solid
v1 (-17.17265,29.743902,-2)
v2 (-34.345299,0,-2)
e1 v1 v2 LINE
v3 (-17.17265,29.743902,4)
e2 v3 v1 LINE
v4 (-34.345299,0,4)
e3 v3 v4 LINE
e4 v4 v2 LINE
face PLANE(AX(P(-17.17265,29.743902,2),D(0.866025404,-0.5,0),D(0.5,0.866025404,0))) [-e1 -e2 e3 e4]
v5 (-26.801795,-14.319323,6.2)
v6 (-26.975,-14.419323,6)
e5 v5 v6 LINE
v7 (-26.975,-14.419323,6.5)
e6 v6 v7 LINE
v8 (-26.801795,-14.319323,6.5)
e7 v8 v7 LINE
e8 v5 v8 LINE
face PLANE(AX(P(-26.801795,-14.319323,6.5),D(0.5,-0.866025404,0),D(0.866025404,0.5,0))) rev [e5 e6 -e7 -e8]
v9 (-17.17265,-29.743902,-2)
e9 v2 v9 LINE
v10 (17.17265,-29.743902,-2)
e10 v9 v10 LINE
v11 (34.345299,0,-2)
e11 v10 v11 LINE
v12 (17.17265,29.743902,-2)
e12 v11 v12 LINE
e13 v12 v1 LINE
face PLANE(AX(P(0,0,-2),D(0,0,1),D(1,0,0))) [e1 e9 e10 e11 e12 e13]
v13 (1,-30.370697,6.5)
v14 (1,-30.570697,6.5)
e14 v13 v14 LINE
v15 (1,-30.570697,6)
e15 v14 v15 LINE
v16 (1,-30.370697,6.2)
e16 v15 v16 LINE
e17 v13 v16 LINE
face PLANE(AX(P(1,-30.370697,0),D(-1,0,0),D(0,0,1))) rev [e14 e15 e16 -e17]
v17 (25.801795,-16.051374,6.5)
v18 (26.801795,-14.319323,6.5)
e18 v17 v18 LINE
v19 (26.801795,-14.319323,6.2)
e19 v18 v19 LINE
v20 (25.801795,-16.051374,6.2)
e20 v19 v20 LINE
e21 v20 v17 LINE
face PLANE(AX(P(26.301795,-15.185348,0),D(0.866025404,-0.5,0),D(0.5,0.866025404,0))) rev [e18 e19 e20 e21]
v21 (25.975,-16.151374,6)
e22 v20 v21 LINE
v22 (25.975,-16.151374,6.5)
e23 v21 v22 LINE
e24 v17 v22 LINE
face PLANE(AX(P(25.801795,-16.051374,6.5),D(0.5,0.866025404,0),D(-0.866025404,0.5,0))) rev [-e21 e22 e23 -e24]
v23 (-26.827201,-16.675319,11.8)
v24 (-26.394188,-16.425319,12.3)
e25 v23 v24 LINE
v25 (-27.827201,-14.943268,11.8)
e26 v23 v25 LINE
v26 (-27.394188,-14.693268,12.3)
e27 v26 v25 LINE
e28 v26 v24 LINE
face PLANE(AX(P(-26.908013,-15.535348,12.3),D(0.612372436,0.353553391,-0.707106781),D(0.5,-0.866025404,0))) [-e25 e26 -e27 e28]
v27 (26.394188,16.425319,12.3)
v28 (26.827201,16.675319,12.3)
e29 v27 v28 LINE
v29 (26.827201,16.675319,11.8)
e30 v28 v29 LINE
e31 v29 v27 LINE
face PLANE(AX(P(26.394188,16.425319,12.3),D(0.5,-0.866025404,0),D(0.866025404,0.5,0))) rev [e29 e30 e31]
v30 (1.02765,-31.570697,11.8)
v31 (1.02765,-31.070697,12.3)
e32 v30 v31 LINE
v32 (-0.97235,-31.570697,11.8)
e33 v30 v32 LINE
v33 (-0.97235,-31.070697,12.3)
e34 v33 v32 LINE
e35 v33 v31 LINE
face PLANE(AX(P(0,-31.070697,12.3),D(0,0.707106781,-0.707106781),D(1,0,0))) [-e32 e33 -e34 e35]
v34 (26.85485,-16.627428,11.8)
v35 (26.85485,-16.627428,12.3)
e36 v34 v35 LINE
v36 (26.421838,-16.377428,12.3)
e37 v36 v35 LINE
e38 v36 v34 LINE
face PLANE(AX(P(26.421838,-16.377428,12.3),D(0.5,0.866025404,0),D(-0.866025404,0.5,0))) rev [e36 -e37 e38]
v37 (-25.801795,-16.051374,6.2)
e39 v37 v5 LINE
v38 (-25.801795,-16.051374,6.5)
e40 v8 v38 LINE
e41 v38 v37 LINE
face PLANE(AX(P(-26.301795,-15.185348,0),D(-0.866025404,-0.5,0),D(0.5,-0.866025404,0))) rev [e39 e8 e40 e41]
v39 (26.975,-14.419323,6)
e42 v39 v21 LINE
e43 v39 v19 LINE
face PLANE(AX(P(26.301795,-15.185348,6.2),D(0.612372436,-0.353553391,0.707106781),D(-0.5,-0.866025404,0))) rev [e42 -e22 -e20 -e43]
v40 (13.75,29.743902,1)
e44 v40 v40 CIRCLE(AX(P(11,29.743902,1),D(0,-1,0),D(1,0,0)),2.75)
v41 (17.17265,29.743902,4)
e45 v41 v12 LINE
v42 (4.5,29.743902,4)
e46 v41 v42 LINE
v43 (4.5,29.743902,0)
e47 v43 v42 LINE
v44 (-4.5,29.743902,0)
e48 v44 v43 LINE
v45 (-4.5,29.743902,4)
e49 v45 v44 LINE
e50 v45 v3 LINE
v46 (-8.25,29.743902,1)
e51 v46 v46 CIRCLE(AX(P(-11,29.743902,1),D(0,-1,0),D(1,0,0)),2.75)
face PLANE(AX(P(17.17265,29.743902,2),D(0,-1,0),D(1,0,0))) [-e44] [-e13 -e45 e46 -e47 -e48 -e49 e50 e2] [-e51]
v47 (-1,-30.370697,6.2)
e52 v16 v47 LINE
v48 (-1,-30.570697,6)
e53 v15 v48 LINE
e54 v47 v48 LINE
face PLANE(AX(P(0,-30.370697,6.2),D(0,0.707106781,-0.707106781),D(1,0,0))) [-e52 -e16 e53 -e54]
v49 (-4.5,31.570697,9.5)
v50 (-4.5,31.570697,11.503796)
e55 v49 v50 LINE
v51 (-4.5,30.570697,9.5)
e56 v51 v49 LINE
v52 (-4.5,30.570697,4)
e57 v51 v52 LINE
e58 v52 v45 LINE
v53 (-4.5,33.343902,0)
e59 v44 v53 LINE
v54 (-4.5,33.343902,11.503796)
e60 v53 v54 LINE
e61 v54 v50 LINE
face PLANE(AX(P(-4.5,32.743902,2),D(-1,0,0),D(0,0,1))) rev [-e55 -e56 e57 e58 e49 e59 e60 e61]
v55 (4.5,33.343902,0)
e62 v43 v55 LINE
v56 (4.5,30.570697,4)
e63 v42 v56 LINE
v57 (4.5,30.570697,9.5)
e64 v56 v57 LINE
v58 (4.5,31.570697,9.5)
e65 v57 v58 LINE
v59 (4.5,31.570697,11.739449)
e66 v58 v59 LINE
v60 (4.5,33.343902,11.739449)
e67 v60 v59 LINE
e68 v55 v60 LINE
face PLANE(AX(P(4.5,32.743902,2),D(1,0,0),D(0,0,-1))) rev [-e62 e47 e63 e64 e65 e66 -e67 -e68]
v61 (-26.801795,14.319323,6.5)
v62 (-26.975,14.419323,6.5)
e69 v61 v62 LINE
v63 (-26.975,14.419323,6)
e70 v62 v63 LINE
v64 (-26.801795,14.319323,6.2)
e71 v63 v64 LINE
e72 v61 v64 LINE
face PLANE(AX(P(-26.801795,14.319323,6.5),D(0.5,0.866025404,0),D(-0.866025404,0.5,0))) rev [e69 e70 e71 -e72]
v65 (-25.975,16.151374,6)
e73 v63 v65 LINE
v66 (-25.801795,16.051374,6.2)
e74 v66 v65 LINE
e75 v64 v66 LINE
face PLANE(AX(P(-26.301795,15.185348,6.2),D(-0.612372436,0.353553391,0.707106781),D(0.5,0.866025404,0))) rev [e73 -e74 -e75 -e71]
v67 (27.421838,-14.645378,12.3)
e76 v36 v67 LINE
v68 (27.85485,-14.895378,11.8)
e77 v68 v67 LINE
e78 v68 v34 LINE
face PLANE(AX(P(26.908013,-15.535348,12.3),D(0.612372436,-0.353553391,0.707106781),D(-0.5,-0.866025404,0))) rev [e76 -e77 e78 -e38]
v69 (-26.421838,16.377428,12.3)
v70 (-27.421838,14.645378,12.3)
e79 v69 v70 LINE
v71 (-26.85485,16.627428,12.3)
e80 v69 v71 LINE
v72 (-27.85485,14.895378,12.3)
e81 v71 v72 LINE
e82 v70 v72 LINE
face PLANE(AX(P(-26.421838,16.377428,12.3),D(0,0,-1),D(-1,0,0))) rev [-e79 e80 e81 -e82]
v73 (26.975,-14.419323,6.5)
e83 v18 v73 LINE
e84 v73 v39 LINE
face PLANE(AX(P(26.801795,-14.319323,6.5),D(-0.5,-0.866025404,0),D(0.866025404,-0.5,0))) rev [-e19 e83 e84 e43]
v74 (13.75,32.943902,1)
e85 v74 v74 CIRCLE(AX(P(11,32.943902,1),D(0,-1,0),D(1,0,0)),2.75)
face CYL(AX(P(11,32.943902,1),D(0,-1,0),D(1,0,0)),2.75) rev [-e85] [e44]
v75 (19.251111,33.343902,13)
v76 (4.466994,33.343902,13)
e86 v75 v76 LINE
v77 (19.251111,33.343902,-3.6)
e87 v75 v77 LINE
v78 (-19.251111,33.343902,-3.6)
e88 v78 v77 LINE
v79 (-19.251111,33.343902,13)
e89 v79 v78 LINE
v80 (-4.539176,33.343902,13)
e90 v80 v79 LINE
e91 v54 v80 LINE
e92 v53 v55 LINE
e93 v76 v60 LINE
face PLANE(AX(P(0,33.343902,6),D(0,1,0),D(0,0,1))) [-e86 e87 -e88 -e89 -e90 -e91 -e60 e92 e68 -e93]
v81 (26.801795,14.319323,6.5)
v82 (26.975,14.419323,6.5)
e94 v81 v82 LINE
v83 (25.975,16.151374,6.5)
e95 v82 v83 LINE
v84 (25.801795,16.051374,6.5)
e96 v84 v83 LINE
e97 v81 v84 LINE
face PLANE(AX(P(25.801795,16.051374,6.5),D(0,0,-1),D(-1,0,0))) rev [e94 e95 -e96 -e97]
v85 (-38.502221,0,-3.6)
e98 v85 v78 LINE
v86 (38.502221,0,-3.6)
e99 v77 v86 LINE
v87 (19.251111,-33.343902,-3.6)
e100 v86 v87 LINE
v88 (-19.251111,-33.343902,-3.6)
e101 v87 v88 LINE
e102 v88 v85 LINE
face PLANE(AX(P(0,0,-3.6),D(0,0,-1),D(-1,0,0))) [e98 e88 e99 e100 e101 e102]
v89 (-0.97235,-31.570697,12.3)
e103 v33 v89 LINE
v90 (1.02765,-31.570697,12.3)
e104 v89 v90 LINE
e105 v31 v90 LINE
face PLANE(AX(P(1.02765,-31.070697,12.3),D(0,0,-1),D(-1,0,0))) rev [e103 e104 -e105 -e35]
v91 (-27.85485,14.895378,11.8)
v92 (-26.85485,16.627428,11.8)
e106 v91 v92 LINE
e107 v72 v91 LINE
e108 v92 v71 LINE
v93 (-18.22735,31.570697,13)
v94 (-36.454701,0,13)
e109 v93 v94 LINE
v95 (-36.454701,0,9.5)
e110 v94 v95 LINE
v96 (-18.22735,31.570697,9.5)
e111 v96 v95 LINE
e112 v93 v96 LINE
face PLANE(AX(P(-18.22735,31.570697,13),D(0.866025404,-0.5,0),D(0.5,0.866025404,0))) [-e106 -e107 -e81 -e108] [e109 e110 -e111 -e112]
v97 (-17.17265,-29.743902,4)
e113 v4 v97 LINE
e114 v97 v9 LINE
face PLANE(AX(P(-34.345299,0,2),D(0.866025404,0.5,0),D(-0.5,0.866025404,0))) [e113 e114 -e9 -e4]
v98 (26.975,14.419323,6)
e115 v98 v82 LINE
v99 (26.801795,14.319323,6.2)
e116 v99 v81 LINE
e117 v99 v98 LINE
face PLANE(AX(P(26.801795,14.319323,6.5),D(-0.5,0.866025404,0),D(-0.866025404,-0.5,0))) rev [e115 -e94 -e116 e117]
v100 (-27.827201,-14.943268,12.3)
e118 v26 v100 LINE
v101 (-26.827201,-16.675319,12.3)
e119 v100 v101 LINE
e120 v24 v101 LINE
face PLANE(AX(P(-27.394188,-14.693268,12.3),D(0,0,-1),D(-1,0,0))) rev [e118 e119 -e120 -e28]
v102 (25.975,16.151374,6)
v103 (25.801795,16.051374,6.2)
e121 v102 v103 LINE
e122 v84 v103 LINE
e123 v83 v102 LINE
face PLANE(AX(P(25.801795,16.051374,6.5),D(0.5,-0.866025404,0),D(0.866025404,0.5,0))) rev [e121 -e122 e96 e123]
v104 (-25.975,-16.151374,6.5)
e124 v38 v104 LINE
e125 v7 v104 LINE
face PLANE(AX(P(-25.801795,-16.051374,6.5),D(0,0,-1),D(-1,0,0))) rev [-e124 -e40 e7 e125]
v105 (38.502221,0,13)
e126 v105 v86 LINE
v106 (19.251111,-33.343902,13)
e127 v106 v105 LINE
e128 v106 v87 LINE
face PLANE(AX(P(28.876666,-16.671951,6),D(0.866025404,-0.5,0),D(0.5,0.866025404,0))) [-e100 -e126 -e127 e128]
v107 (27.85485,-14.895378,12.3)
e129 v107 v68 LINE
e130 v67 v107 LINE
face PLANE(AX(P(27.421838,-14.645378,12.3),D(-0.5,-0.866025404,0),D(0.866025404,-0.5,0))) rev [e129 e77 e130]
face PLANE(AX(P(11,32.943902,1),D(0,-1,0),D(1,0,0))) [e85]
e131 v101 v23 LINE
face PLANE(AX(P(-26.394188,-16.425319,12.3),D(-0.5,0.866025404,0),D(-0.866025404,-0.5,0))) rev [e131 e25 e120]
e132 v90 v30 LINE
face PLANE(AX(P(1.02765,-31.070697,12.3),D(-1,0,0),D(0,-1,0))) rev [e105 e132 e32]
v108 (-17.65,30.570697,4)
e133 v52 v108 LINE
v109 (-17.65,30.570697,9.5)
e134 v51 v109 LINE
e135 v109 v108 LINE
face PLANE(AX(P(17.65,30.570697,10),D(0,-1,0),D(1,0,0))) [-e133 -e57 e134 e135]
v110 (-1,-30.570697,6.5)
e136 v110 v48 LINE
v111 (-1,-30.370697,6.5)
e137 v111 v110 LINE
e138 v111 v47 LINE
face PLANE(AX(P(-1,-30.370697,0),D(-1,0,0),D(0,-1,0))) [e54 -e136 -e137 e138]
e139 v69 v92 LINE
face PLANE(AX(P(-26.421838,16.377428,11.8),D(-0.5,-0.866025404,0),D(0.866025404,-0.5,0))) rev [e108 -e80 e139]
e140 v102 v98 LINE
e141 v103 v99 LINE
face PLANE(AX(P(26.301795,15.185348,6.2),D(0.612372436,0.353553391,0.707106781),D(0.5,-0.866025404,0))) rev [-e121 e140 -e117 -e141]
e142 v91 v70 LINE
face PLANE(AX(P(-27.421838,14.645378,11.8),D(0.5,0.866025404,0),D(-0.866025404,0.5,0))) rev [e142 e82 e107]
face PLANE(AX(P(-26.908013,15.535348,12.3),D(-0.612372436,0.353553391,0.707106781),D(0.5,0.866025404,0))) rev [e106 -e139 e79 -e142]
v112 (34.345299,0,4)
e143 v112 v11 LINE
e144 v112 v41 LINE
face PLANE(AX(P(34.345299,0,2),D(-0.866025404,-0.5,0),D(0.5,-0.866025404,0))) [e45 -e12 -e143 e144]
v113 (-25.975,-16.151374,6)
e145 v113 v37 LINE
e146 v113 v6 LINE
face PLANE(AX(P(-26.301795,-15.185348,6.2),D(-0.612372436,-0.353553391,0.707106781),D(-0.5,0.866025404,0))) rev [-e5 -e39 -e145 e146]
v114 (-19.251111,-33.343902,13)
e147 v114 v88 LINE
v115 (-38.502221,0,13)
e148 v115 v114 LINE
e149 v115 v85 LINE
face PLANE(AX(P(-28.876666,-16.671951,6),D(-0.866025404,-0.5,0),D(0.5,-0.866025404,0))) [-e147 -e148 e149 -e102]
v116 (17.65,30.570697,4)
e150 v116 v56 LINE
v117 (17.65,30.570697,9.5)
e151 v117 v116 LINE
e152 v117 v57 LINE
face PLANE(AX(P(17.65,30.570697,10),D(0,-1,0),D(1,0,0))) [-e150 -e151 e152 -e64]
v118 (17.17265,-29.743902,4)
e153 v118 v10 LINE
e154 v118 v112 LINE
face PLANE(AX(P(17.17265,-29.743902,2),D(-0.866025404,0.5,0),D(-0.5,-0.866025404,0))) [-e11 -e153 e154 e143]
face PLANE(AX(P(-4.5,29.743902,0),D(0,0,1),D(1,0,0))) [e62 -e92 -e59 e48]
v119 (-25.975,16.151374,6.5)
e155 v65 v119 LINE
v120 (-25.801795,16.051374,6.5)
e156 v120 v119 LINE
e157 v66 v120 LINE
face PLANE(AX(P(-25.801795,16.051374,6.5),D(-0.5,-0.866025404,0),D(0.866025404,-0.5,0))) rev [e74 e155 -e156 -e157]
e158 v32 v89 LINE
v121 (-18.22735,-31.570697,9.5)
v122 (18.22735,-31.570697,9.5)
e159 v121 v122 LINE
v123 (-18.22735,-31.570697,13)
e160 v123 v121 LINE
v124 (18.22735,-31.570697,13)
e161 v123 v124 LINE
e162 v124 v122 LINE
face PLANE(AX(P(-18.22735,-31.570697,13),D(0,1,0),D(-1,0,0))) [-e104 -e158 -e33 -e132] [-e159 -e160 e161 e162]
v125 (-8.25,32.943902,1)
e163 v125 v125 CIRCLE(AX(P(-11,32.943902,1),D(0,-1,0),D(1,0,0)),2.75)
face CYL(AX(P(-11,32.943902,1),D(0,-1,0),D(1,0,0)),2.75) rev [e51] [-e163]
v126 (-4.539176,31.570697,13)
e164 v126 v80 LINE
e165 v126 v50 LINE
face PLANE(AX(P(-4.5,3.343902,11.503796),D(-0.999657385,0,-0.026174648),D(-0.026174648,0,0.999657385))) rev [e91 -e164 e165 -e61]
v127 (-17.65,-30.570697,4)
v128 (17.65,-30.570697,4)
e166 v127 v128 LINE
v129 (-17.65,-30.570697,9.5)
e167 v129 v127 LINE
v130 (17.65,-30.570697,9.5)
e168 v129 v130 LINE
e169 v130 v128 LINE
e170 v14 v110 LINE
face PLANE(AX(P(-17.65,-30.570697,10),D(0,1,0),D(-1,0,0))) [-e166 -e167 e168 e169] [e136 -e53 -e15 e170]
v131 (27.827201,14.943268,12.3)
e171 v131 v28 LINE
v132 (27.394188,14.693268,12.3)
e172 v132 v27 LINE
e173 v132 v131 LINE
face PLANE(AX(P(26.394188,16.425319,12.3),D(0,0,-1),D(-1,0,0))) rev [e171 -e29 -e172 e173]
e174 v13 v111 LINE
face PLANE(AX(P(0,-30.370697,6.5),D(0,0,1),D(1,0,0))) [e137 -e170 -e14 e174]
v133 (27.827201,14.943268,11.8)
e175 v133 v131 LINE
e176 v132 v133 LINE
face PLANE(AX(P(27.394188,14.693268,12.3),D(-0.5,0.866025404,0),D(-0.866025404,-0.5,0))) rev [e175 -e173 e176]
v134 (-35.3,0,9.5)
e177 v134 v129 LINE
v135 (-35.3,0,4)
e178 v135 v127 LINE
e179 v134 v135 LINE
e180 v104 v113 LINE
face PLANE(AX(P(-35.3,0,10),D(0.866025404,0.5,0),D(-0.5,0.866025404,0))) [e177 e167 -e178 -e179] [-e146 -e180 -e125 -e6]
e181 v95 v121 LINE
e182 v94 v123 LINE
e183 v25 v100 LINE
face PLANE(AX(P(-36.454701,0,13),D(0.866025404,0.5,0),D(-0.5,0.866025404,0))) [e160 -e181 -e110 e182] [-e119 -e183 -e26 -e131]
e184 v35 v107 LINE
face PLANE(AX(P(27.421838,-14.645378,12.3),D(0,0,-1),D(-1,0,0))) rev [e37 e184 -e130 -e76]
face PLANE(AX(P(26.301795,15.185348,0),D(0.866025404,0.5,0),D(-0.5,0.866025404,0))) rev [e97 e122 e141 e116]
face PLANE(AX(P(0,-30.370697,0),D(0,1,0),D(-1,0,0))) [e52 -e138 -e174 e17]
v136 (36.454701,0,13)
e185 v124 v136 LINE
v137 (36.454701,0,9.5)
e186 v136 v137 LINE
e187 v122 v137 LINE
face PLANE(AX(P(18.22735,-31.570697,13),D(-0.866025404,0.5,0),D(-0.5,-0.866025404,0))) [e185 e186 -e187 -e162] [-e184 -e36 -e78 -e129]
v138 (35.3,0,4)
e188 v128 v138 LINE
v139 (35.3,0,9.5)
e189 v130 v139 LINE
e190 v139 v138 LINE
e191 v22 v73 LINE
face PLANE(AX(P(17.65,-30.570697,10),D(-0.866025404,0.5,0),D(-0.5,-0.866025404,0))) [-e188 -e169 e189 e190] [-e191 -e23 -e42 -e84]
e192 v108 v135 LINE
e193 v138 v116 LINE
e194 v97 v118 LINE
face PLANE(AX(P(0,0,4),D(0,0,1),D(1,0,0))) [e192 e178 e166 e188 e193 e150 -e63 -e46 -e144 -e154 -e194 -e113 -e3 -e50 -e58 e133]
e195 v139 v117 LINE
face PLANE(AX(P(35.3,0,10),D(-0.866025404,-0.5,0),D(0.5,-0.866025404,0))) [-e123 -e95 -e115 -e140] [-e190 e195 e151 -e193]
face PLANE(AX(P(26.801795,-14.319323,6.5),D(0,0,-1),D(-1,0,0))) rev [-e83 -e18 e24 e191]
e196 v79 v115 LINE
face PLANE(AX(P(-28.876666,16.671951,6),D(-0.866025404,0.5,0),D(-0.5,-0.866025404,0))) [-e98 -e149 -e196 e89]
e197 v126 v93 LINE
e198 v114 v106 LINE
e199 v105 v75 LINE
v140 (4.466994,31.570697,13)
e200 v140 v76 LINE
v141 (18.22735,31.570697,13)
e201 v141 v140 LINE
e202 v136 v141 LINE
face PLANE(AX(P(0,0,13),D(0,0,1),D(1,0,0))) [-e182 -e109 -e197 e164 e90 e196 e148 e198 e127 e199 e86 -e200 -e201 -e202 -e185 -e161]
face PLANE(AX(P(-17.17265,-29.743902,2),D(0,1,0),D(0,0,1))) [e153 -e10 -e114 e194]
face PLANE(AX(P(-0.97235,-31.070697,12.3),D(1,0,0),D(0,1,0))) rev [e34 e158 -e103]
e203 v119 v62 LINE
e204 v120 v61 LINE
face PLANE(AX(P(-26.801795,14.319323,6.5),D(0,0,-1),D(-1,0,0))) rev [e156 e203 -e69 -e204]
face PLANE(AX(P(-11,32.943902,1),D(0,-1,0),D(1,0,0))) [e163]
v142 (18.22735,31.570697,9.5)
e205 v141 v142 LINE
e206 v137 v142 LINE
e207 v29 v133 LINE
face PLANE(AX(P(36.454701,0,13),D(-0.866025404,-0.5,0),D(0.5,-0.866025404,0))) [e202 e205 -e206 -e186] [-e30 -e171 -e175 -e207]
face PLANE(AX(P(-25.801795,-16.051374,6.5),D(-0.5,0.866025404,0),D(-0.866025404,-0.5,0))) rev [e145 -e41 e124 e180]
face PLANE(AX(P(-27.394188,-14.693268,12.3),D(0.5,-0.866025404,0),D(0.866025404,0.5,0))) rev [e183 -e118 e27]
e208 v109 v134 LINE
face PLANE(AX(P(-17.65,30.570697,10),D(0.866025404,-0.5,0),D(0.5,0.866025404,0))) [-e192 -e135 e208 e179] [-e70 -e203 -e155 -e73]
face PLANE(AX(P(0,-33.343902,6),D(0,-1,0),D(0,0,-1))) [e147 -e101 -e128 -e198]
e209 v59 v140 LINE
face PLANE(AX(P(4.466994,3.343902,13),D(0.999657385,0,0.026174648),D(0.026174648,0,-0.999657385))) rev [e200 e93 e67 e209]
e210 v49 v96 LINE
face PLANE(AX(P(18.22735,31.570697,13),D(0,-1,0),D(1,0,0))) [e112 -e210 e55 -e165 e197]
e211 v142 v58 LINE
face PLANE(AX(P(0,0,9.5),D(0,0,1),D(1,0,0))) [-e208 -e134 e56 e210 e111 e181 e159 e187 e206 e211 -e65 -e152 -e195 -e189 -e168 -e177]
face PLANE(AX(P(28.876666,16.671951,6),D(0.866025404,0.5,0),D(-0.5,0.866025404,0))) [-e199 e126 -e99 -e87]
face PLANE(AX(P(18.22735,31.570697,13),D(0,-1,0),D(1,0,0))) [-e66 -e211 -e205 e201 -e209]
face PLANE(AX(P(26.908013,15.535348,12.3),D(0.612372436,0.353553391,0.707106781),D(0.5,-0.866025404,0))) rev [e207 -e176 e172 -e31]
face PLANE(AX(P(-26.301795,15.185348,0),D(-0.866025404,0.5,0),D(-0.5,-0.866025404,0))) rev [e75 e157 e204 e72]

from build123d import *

# Parameters (mm, degrees)
BOSS_EXTRUDE1_DEPTH  = 10
BOSS_EXTRUDE2_DEPTH  = 1.6
BOSS_EXTRUDE5_DEPTH  = 1.6
BOSS_EXTRUDE6_DEPTH  = 2
SKETCH10_W           = 9
SKETCH10_H           = 8
CUT_EXTRUDE1_DEPTH   = 2
BOSS_EXTRUDE7_DEPTH  = 8
CUT_EXTRUDE2_DEPTH   = 4
SKETCH13_W           = 9
SKETCH13_H           = 4
CUT_EXTRUDE3_DEPTH   = 4
SKETCH16_W           = 9
SKETCH16_H           = 2
CUT_EXTRUDE4_DEPTH   = 3
BOSS_EXTRUDE10_DEPTH = 7.6
SKETCH21_W           = 9
SKETCH21_H           = 1
CUT_EXTRUDE5_DEPTH   = 6
CUT_EXTRUDE7_DEPTH   = 2.2
BOSS_EXTRUDE11_DEPTH = 2
CUT_EXTRUDE8_DEPTH   = 2
BOSS_EXTRUDE12_DEPTH = 2
BOSS_EXTRUDE13_DEPTH = 5.7
BOSS_EXTRUDE14_DEPTH = 5
CUT_EXTRUDE9_DEPTH   = 76.043267682
SKETCH30_W           = 2
SKETCH30_H           = 0.5
BOSS_EXTRUDE15_DEPTH = 0.2
CHAMFER1_SIZE        = 0.2
SKETCH31_W           = 0.5
SKETCH31_H           = 2
BOSS_EXTRUDE16_DEPTH = 0.2
CHAMFER2_SIZE        = 0.2
SKETCH32_W           = 0.5
SKETCH32_H           = 2
BOSS_EXTRUDE17_DEPTH = 0.2
CHAMFER3_SIZE        = 0.2
SKETCH33_W           = 0.5
SKETCH33_H           = 2
BOSS_EXTRUDE18_DEPTH = 0.2
CHAMFER4_SIZE        = 0.2
BOSS_EXTRUDE25_DEPTH = 2
SKETCH34_W           = 0.5
SKETCH34_H           = 2
BOSS_EXTRUDE19_DEPTH = 0.2
CHAMFER5_SIZE        = 0.2
SKETCH41_W           = 9
SKETCH41_H           = 6
CUT_EXTRUDE10_DEPTH  = 2
SKETCH42_R           = 2.75
CUT_EXTRUDE11_DEPTH  = 3.2
SKETCH50_W           = 0.5
SKETCH50_H           = 2
BOSS_EXTRUDE27_DEPTH = 0.5
SKETCH49_W           = 0.5
SKETCH49_H           = 2
BOSS_EXTRUDE28_DEPTH = 0.5
SKETCH44_W           = 2
SKETCH44_H           = 0.5
BOSS_EXTRUDE29_DEPTH = 0.5
SKETCH45_W           = 0.5
SKETCH45_H           = 2
BOSS_EXTRUDE30_DEPTH = 0.5
SKETCH47_W           = 0.5
SKETCH47_H           = 2
BOSS_EXTRUDE31_DEPTH = 0.5
CHAMFER6_SIZE        = 0.5
CHAMFER7_SIZE        = 0.5
CHAMFER8_SIZE        = 0.5
CHAMFER9_SIZE        = 0.5
CHAMFER10_SIZE       = 0.5
CUT_EXTRUDE12_DEPTH  = 30
SKETCH53_W           = 9
SKETCH53_H           = 2
BOSS_EXTRUDE32_DEPTH = 3.6


with BuildPart() as part:
    # Sketch1 → Boss-Extrude1 (new body)
    with BuildSketch(Plane.XY):
        Polygon((37.347520861, 0), (18.673760431, 32.343901834), (-18.673760431, 32.343901834), (-37.347520861, 0), (-18.673760431, -32.343901834), (18.673760431, -32.343901834), align=None)
        Polygon((35.5, 0), (17.75, 30.743901834), (-17.75, 30.743901834), (-35.5, 0), (-17.75, -30.743901834), (17.75, -30.743901834), align=None, mode=Mode.SUBTRACT)
    extrude(amount=BOSS_EXTRUDE1_DEPTH)

    # Sketch2 → Boss-Extrude2 (add)
    with BuildSketch(Plane(origin=(0, 0, 0), x_dir=(-1, 0, 0), z_dir=(0, 0, -1))):
        Polygon((36.847520861, 0), (18.423760431, 31.910889132), (-18.423760431, 31.910889132), (-36.847520861, 0), (-18.423760431, -31.910889132), (18.423760431, -31.910889132), align=None)
    extrude(amount=BOSS_EXTRUDE2_DEPTH)

    # Sketch8 → Boss-Extrude5 (add)
    with BuildSketch(Plane(origin=(0, 0, 0), x_dir=(-1, 0, 0), z_dir=(0, 0, -1))):
        Polygon((18.673760431, -32.343901834), (37.347520861, 0), (18.673760431, 32.343901834), (-18.673760431, 32.343901834), (-37.347520861, 0), (-18.673760431, -32.343901834), align=None)
    extrude(amount=BOSS_EXTRUDE5_DEPTH)

    # Sketch9 → Boss-Extrude6 (add)
    with BuildSketch(Plane.XY):
        Polygon((-17.75, 30.743901834), (-35.5, 0), (-17.75, -30.743901834), (17.75, -30.743901834), (35.5, 0), (17.75, 30.743901834), align=None)
        Polygon((-34.345299462, 0), (-17.172649731, -29.743901834), (17.172649731, -29.743901834), (34.345299462, 0), (17.172649731, 29.743901834), (-17.172649731, 29.743901834), align=None, mode=Mode.SUBTRACT)
    extrude(amount=BOSS_EXTRUDE6_DEPTH)

    # Sketch10 → Cut-Extrude1 (cut)
    with BuildSketch(Plane.XZ.offset(-30.743901834)):
        with Locations((0, 6)):
            Rectangle(SKETCH10_W, SKETCH10_H)
    extrude(amount=-CUT_EXTRUDE1_DEPTH, mode=Mode.SUBTRACT)

    # Sketch11 → Boss-Extrude7 (add)
    with BuildSketch(Plane.XY.offset(2)):
        Polygon((35.5, 0), (17.75, 30.743901834), (-17.75, 30.743901834), (-35.5, 0), (-17.75, -30.743901834), (17.75, -30.743901834), align=None)
        Polygon((35.3, 0), (17.65, 30.570696754), (-17.65, 30.570696754), (-35.3, 0), (-17.65, -30.570696754), (17.65, -30.570696754), align=None, mode=Mode.SUBTRACT)
    extrude(amount=BOSS_EXTRUDE7_DEPTH)

    # Sketch12 → Cut-Extrude2 (cut)
    with BuildSketch(Plane.XY.offset(10)):
        Polygon((37.347520861, 0), (18.673760431, 32.343901834), (-18.673760431, 32.343901834), (-37.347520861, 0), (-18.673760431, -32.343901834), (18.673760431, -32.343901834), align=None)
    extrude(amount=-CUT_EXTRUDE2_DEPTH, mode=Mode.SUBTRACT)

    # Sketch13 → Cut-Extrude3 (cut)
    with BuildSketch(Plane(origin=(0, 30.743901834, 0), x_dir=(1, 0, 0), z_dir=(0, 1, 0))):
        with Locations((0, -4)):
            Rectangle(SKETCH13_W, SKETCH13_H)
    extrude(amount=-CUT_EXTRUDE3_DEPTH, mode=Mode.SUBTRACT)

    # Sketch16 → Cut-Extrude4 (cut)
    with BuildSketch(Plane(origin=(0, 32.343901834, 0), x_dir=(1, 0, 0), z_dir=(0, 1, 0))):
        with Locations((0, -1)):
            Rectangle(SKETCH16_W, SKETCH16_H)
    extrude(amount=-CUT_EXTRUDE4_DEPTH, mode=Mode.SUBTRACT)

    # Sketch19 → Boss-Extrude10 (add)
    with BuildSketch(Plane(origin=(0, 0, -1.6), x_dir=(-1, 0, 0), z_dir=(0, 0, -1))):
        Polygon((38.5022214, 0), (19.2511107, 33.343901834), (-19.2511107, 33.343901834), (-38.5022214, 0), (-19.2511107, -33.343901834), (19.2511107, -33.343901834), align=None)
        Polygon((-18.673760431, -32.343901834), (18.673760431, -32.343901834), (37.347520861, 0), (18.673760431, 32.343901834), (-18.673760431, 32.343901834), (-37.347520861, 0), align=None, mode=Mode.SUBTRACT)
    extrude(amount=-BOSS_EXTRUDE10_DEPTH)

    # Sketch21 → Cut-Extrude5 (cut)
    with BuildSketch(Plane.XY.offset(6)):
        with Locations((0, 32.843901834)):
            Rectangle(SKETCH21_W, SKETCH21_H)
    extrude(amount=-CUT_EXTRUDE5_DEPTH, mode=Mode.SUBTRACT)

    # Sketch22 → Cut-Extrude7 (cut)
    with BuildSketch(Plane.XY.offset(6)):
        Polygon((-36.454700538, 0), (-18.227350269, -31.570696754), (18.227350269, -31.570696754), (36.454700538, 0), (18.227350269, 31.570696754), (-18.227350269, 31.570696754), align=None)
    extrude(amount=-CUT_EXTRUDE7_DEPTH, mode=Mode.SUBTRACT)

    # Sketch24 → Boss-Extrude11 (add)
    with BuildSketch(Plane(origin=(0, 0, -1.6), x_dir=(-1, 0, 0), z_dir=(0, 0, -1))):
        Polygon((-19.2511107, -33.343901834), (19.2511107, -33.343901834), (38.5022214, 0), (19.2511107, 33.343901834), (-19.2511107, 33.343901834), (-38.5022214, 0), align=None)
    extrude(amount=BOSS_EXTRUDE11_DEPTH)

    # Sketch25 → Cut-Extrude8 (cut)
    with BuildSketch(Plane.XY):
        Polygon((-17.172649731, 29.743901834), (-34.345299462, 0), (-17.172649731, -29.743901834), (17.172649731, -29.743901834), (34.345299462, 0), (17.172649731, 29.743901834), align=None)
    extrude(amount=-CUT_EXTRUDE8_DEPTH, mode=Mode.SUBTRACT)

    # Sketch26 → Boss-Extrude12 (add)
    with BuildSketch(Plane.XY.offset(6)):
        Polygon((19.2511107, 33.343901834), (-19.2511107, 33.343901834), (-38.5022214, 0), (-19.2511107, -33.343901834), (19.2511107, -33.343901834), (38.5022214, 0), align=None)
        Polygon((18.227350269, 31.570696754), (-18.227350269, 31.570696754), (-36.454700538, 0), (-18.227350269, -31.570696754), (18.227350269, -31.570696754), (36.454700538, 0), align=None, mode=Mode.SUBTRACT)
    extrude(amount=BOSS_EXTRUDE12_DEPTH)

    # Sketch27 → Boss-Extrude13 (add)
    with BuildSketch(Plane.XY.offset(3.8)):
        Polygon((-18.227350269, 31.570696754), (-36.454700538, 0), (-18.227350269, -31.570696754), (18.227350269, -31.570696754), (36.454700538, 0), (18.227350269, 31.570696754), align=None)
        Polygon((-17.65, 30.570696754), (-35.3, 0), (-17.65, -30.570696754), (17.65, -30.570696754), (35.3, 0), (17.65, 30.570696754), align=None, mode=Mode.SUBTRACT)
    extrude(amount=BOSS_EXTRUDE13_DEPTH)

    # Sketch28 → Boss-Extrude14 (add)
    with BuildSketch(Plane.XY.offset(8)):
        Polygon((19.2511107, 33.343901834), (-19.2511107, 33.343901834), (-38.5022214, 0), (-19.2511107, -33.343901834), (19.2511107, -33.343901834), (38.5022214, 0), align=None)
        Polygon((18.227350269, 31.570696754), (-18.227350269, 31.570696754), (-36.454700538, 0), (-18.227350269, -31.570696754), (18.227350269, -31.570696754), (36.454700538, 0), align=None, mode=Mode.SUBTRACT)
    extrude(amount=BOSS_EXTRUDE14_DEPTH)

    # Sketch29 → Cut-Extrude9 (cut, through all)
    with BuildSketch(Plane(origin=(0, 29.743901834, 0), x_dir=(-1, 0, 0), z_dir=(0, -1, 0))):
        Polygon((4.5, -11.503796338), (-4.5, 0), (-4.5, -1.545129158), (-4.5, -2), (-4.5, -11.739448905), align=None)
        Polygon((4.5, -1.717056643), (4.5, 0), (-4.5, 0), (4.5, -11.503796338), (4.5, -2), align=None)
        Polygon((4.5, 0), (4.5, 2), (-4.5, 0), align=None)
        Polygon((-4.5, 0), (4.5, 2), (-4.5, 2), align=None)
    extrude(amount=-CUT_EXTRUDE9_DEPTH, mode=Mode.SUBTRACT)

    # Sketch30 → Boss-Extrude15 (add)
    with BuildSketch(Plane(origin=(0, -30.570696754, 0), x_dir=(1, 0, 0), z_dir=(0, 1, 0))):
        with Locations((0, -6.25)):
            Rectangle(SKETCH30_W, SKETCH30_H)
    extrude(amount=BOSS_EXTRUDE15_DEPTH)

    # Chamfer1
    chamfer1_edges = [part.edges().sort_by_distance(p)[0] for p in [
        (0, -30.370696754, 6),
    ]]
    chamfer(chamfer1_edges, length=CHAMFER1_SIZE - 0.0001)  # a hair under: the kernel refuses the full size

    # Sketch31 → Boss-Extrude16 (add)
    with BuildSketch(Plane(origin=(-26.475, -15.285348377, 0), x_dir=(0, 0, -1), z_dir=(0.8660254037844388, 0.49999999999999994, 0))):
        with Locations((-6.25, 0)):
            Rectangle(SKETCH31_W, SKETCH31_H)
    extrude(amount=BOSS_EXTRUDE16_DEPTH)

    # Chamfer2
    chamfer2_edges = [part.edges().sort_by_distance(p)[0] for p in [
        (-26.301794919, -15.185348377, 6),
    ]]
    chamfer(chamfer2_edges, length=CHAMFER2_SIZE - 0.0001)  # a hair under: the kernel refuses the full size

    # Sketch32 → Boss-Extrude17 (add)
    with BuildSketch(Plane(origin=(-26.475, 15.285348377, 0), x_dir=(0, 0, -1), z_dir=(0.8660254037844386, -0.5000000000000002, 0))):
        with Locations((-6.25, 0)):
            Rectangle(SKETCH32_W, SKETCH32_H)
    extrude(amount=BOSS_EXTRUDE17_DEPTH)

    # Chamfer3
    chamfer3_edges = [part.edges().sort_by_distance(p)[0] for p in [
        (-26.301794919, 15.185348377, 6),
    ]]
    chamfer(chamfer3_edges, length=CHAMFER3_SIZE - 0.0001)  # a hair under: the kernel refuses the full size

    # Sketch33 → Boss-Extrude18 (add)
    with BuildSketch(Plane(origin=(26.475, -15.285348377, 0), x_dir=(0, 0, 1), z_dir=(-0.8660254037844388, 0.49999999999999967, 0))):
        with Locations((6.25, 0)):
            Rectangle(SKETCH33_W, SKETCH33_H)
    extrude(amount=BOSS_EXTRUDE18_DEPTH)

    # Chamfer4
    chamfer4_edges = [part.edges().sort_by_distance(p)[0] for p in [
        (26.301794919, -15.185348377, 6),
    ]]
    chamfer(chamfer4_edges, length=CHAMFER4_SIZE - 0.0001)  # a hair under: the kernel refuses the full size

    # Sketch40 → Boss-Extrude25 (add)
    with BuildSketch(Plane.XY.offset(2)):
        Polygon((-17.65, 30.570696754), (-35.3, 0), (-17.65, -30.570696754), (17.65, -30.570696754), (35.3, 0), (17.65, 30.570696754), align=None)
        Polygon((-17.172649731, 29.743901834), (-34.345299462, 0), (-17.172649731, -29.743901834), (17.172649731, -29.743901834), (34.345299462, 0), (17.172649731, 29.743901834), align=None, mode=Mode.SUBTRACT)
    extrude(amount=BOSS_EXTRUDE25_DEPTH)

    # Sketch34 → Boss-Extrude19 (add)
    with BuildSketch(Plane(origin=(26.475, 15.285348377, 0), x_dir=(0, 0, 1), z_dir=(-0.8660254037844387, -0.4999999999999999, 0))):
        with Locations((6.25, 0)):
            Rectangle(SKETCH34_W, SKETCH34_H)
    extrude(amount=BOSS_EXTRUDE19_DEPTH)

    # Chamfer5
    chamfer5_edges = [part.edges().sort_by_distance(p)[0] for p in [
        (26.301794919, 15.185348377, 6),
    ]]
    chamfer(chamfer5_edges, length=CHAMFER5_SIZE - 0.0001)  # a hair under: the kernel refuses the full size

    # Sketch41 → Cut-Extrude10 (cut)
    with BuildSketch(Plane(origin=(0, 29.743901834, 0), x_dir=(-1, 0, 0), z_dir=(0, -1, 0))):
        with Locations((0, -1)):
            Rectangle(SKETCH41_W, SKETCH41_H)
    extrude(amount=-CUT_EXTRUDE10_DEPTH, mode=Mode.SUBTRACT)

    # Sketch42 → Cut-Extrude11 (cut)
    with BuildSketch(Plane(origin=(0, 29.743901834, 0), x_dir=(-1, 0, 0), z_dir=(0, -1, 0))):
        with Locations(Location((-11, -1, 0), (0, 0, 180))):
            Circle(SKETCH42_R)
        with Locations(Location((11, -1, 0), (0, 0, 180))):
            Circle(SKETCH42_R)
    extrude(amount=-CUT_EXTRUDE11_DEPTH, mode=Mode.SUBTRACT)

    # Sketch50 → Boss-Extrude27 (add)
    with BuildSketch(Plane(origin=(-27.341025404, 15.785348377, 0), x_dir=(0, 0, -1), z_dir=(0.8660254037844404, -0.49999999999999695, 0))):
        with Locations((-12.05, -0.027649731)):
            Rectangle(SKETCH50_W, SKETCH50_H)
    extrude(amount=BOSS_EXTRUDE27_DEPTH)

    # Sketch49 → Boss-Extrude28 (add)
    with BuildSketch(Plane(origin=(-27.341025404, -15.785348377, 0), x_dir=(0, 0, -1), z_dir=(0.8660254037844357, 0.5000000000000052, 0))):
        with Locations((-12.05, -0.027649731)):
            Rectangle(SKETCH49_W, SKETCH49_H)
    extrude(amount=BOSS_EXTRUDE28_DEPTH)

    # Sketch44 → Boss-Extrude29 (add)
    with BuildSketch(Plane(origin=(0, -31.570696754, 0), x_dir=(1, 0, 0), z_dir=(0, 1, 0))):
        with Locations((0.027649731, -12.05)):
            Rectangle(SKETCH44_W, SKETCH44_H)
    extrude(amount=BOSS_EXTRUDE29_DEPTH)

    # Sketch45 → Boss-Extrude30 (add)
    with BuildSketch(Plane(origin=(27.341025404, -15.785348377, 0), x_dir=(0, 0, 1), z_dir=(-0.8660254037844439, 0.49999999999999106, 0))):
        with Locations((12.05, 0.027649731)):
            Rectangle(SKETCH45_W, SKETCH45_H)
    extrude(amount=BOSS_EXTRUDE30_DEPTH)

    # Sketch47 → Boss-Extrude31 (add)
    with BuildSketch(Plane(origin=(27.341025404, 15.785348377, 0), x_dir=(0, 0, 1), z_dir=(-0.8660254037844356, -0.5000000000000054, 0))):
        with Locations((12.05, 0.027649731)):
            Rectangle(SKETCH47_W, SKETCH47_H)
    extrude(amount=BOSS_EXTRUDE31_DEPTH)

    # Chamfer6
    chamfer6_edges = [part.edges().sort_by_distance(p)[0] for p in [
        (26.894187836, 15.559293746, 11.8),
    ]]
    chamfer(chamfer6_edges, length=CHAMFER6_SIZE - 0.0001)  # a hair under: the kernel refuses the full size

    # Chamfer7
    chamfer7_edges = [part.edges().sort_by_distance(p)[0] for p in [
        (26.921837567, -15.511403008, 11.8),
    ]]
    chamfer(chamfer7_edges, length=CHAMFER7_SIZE - 0.0001)  # a hair under: the kernel refuses the full size

    # Chamfer8
    chamfer8_edges = [part.edges().sort_by_distance(p)[0] for p in [
        (0.027649731, -31.070696754, 11.8),
    ]]
    chamfer(chamfer8_edges, length=CHAMFER8_SIZE - 0.0001)  # a hair under: the kernel refuses the full size

    # Chamfer9
    chamfer9_edges = [part.edges().sort_by_distance(p)[0] for p in [
        (-26.894187836, -15.559293746, 11.8),
    ]]
    chamfer(chamfer9_edges, length=CHAMFER9_SIZE - 0.0001)  # a hair under: the kernel refuses the full size

    # Chamfer10
    chamfer10_edges = [part.edges().sort_by_distance(p)[0] for p in [
        (-26.921837567, 15.511403008, 11.8),
    ]]
    chamfer(chamfer10_edges, length=CHAMFER10_SIZE - 0.0001)  # a hair under: the kernel refuses the full size

    # Sketch52 → Cut-Extrude12 (cut)
    with BuildSketch(Plane(origin=(0, 33.343901834, 0), x_dir=(1, 0, 0), z_dir=(0, 1, 0))):
        Polygon((4.5, -11.739448905), (-4.5, -11.503796338), (-4.539176026, -13), (4.466994211, -13), align=None)
    extrude(amount=-CUT_EXTRUDE12_DEPTH, mode=Mode.SUBTRACT)

    # Sketch53 → Boss-Extrude32 (add)
    with BuildSketch(Plane(origin=(0, 33.343901834, 0), x_dir=(1, 0, 0), z_dir=(0, 1, 0))):
        with Locations((0, 1)):
            Rectangle(SKETCH53_W, SKETCH53_H)
    extrude(amount=-BOSS_EXTRUDE32_DEPTH)


solid = part.part
